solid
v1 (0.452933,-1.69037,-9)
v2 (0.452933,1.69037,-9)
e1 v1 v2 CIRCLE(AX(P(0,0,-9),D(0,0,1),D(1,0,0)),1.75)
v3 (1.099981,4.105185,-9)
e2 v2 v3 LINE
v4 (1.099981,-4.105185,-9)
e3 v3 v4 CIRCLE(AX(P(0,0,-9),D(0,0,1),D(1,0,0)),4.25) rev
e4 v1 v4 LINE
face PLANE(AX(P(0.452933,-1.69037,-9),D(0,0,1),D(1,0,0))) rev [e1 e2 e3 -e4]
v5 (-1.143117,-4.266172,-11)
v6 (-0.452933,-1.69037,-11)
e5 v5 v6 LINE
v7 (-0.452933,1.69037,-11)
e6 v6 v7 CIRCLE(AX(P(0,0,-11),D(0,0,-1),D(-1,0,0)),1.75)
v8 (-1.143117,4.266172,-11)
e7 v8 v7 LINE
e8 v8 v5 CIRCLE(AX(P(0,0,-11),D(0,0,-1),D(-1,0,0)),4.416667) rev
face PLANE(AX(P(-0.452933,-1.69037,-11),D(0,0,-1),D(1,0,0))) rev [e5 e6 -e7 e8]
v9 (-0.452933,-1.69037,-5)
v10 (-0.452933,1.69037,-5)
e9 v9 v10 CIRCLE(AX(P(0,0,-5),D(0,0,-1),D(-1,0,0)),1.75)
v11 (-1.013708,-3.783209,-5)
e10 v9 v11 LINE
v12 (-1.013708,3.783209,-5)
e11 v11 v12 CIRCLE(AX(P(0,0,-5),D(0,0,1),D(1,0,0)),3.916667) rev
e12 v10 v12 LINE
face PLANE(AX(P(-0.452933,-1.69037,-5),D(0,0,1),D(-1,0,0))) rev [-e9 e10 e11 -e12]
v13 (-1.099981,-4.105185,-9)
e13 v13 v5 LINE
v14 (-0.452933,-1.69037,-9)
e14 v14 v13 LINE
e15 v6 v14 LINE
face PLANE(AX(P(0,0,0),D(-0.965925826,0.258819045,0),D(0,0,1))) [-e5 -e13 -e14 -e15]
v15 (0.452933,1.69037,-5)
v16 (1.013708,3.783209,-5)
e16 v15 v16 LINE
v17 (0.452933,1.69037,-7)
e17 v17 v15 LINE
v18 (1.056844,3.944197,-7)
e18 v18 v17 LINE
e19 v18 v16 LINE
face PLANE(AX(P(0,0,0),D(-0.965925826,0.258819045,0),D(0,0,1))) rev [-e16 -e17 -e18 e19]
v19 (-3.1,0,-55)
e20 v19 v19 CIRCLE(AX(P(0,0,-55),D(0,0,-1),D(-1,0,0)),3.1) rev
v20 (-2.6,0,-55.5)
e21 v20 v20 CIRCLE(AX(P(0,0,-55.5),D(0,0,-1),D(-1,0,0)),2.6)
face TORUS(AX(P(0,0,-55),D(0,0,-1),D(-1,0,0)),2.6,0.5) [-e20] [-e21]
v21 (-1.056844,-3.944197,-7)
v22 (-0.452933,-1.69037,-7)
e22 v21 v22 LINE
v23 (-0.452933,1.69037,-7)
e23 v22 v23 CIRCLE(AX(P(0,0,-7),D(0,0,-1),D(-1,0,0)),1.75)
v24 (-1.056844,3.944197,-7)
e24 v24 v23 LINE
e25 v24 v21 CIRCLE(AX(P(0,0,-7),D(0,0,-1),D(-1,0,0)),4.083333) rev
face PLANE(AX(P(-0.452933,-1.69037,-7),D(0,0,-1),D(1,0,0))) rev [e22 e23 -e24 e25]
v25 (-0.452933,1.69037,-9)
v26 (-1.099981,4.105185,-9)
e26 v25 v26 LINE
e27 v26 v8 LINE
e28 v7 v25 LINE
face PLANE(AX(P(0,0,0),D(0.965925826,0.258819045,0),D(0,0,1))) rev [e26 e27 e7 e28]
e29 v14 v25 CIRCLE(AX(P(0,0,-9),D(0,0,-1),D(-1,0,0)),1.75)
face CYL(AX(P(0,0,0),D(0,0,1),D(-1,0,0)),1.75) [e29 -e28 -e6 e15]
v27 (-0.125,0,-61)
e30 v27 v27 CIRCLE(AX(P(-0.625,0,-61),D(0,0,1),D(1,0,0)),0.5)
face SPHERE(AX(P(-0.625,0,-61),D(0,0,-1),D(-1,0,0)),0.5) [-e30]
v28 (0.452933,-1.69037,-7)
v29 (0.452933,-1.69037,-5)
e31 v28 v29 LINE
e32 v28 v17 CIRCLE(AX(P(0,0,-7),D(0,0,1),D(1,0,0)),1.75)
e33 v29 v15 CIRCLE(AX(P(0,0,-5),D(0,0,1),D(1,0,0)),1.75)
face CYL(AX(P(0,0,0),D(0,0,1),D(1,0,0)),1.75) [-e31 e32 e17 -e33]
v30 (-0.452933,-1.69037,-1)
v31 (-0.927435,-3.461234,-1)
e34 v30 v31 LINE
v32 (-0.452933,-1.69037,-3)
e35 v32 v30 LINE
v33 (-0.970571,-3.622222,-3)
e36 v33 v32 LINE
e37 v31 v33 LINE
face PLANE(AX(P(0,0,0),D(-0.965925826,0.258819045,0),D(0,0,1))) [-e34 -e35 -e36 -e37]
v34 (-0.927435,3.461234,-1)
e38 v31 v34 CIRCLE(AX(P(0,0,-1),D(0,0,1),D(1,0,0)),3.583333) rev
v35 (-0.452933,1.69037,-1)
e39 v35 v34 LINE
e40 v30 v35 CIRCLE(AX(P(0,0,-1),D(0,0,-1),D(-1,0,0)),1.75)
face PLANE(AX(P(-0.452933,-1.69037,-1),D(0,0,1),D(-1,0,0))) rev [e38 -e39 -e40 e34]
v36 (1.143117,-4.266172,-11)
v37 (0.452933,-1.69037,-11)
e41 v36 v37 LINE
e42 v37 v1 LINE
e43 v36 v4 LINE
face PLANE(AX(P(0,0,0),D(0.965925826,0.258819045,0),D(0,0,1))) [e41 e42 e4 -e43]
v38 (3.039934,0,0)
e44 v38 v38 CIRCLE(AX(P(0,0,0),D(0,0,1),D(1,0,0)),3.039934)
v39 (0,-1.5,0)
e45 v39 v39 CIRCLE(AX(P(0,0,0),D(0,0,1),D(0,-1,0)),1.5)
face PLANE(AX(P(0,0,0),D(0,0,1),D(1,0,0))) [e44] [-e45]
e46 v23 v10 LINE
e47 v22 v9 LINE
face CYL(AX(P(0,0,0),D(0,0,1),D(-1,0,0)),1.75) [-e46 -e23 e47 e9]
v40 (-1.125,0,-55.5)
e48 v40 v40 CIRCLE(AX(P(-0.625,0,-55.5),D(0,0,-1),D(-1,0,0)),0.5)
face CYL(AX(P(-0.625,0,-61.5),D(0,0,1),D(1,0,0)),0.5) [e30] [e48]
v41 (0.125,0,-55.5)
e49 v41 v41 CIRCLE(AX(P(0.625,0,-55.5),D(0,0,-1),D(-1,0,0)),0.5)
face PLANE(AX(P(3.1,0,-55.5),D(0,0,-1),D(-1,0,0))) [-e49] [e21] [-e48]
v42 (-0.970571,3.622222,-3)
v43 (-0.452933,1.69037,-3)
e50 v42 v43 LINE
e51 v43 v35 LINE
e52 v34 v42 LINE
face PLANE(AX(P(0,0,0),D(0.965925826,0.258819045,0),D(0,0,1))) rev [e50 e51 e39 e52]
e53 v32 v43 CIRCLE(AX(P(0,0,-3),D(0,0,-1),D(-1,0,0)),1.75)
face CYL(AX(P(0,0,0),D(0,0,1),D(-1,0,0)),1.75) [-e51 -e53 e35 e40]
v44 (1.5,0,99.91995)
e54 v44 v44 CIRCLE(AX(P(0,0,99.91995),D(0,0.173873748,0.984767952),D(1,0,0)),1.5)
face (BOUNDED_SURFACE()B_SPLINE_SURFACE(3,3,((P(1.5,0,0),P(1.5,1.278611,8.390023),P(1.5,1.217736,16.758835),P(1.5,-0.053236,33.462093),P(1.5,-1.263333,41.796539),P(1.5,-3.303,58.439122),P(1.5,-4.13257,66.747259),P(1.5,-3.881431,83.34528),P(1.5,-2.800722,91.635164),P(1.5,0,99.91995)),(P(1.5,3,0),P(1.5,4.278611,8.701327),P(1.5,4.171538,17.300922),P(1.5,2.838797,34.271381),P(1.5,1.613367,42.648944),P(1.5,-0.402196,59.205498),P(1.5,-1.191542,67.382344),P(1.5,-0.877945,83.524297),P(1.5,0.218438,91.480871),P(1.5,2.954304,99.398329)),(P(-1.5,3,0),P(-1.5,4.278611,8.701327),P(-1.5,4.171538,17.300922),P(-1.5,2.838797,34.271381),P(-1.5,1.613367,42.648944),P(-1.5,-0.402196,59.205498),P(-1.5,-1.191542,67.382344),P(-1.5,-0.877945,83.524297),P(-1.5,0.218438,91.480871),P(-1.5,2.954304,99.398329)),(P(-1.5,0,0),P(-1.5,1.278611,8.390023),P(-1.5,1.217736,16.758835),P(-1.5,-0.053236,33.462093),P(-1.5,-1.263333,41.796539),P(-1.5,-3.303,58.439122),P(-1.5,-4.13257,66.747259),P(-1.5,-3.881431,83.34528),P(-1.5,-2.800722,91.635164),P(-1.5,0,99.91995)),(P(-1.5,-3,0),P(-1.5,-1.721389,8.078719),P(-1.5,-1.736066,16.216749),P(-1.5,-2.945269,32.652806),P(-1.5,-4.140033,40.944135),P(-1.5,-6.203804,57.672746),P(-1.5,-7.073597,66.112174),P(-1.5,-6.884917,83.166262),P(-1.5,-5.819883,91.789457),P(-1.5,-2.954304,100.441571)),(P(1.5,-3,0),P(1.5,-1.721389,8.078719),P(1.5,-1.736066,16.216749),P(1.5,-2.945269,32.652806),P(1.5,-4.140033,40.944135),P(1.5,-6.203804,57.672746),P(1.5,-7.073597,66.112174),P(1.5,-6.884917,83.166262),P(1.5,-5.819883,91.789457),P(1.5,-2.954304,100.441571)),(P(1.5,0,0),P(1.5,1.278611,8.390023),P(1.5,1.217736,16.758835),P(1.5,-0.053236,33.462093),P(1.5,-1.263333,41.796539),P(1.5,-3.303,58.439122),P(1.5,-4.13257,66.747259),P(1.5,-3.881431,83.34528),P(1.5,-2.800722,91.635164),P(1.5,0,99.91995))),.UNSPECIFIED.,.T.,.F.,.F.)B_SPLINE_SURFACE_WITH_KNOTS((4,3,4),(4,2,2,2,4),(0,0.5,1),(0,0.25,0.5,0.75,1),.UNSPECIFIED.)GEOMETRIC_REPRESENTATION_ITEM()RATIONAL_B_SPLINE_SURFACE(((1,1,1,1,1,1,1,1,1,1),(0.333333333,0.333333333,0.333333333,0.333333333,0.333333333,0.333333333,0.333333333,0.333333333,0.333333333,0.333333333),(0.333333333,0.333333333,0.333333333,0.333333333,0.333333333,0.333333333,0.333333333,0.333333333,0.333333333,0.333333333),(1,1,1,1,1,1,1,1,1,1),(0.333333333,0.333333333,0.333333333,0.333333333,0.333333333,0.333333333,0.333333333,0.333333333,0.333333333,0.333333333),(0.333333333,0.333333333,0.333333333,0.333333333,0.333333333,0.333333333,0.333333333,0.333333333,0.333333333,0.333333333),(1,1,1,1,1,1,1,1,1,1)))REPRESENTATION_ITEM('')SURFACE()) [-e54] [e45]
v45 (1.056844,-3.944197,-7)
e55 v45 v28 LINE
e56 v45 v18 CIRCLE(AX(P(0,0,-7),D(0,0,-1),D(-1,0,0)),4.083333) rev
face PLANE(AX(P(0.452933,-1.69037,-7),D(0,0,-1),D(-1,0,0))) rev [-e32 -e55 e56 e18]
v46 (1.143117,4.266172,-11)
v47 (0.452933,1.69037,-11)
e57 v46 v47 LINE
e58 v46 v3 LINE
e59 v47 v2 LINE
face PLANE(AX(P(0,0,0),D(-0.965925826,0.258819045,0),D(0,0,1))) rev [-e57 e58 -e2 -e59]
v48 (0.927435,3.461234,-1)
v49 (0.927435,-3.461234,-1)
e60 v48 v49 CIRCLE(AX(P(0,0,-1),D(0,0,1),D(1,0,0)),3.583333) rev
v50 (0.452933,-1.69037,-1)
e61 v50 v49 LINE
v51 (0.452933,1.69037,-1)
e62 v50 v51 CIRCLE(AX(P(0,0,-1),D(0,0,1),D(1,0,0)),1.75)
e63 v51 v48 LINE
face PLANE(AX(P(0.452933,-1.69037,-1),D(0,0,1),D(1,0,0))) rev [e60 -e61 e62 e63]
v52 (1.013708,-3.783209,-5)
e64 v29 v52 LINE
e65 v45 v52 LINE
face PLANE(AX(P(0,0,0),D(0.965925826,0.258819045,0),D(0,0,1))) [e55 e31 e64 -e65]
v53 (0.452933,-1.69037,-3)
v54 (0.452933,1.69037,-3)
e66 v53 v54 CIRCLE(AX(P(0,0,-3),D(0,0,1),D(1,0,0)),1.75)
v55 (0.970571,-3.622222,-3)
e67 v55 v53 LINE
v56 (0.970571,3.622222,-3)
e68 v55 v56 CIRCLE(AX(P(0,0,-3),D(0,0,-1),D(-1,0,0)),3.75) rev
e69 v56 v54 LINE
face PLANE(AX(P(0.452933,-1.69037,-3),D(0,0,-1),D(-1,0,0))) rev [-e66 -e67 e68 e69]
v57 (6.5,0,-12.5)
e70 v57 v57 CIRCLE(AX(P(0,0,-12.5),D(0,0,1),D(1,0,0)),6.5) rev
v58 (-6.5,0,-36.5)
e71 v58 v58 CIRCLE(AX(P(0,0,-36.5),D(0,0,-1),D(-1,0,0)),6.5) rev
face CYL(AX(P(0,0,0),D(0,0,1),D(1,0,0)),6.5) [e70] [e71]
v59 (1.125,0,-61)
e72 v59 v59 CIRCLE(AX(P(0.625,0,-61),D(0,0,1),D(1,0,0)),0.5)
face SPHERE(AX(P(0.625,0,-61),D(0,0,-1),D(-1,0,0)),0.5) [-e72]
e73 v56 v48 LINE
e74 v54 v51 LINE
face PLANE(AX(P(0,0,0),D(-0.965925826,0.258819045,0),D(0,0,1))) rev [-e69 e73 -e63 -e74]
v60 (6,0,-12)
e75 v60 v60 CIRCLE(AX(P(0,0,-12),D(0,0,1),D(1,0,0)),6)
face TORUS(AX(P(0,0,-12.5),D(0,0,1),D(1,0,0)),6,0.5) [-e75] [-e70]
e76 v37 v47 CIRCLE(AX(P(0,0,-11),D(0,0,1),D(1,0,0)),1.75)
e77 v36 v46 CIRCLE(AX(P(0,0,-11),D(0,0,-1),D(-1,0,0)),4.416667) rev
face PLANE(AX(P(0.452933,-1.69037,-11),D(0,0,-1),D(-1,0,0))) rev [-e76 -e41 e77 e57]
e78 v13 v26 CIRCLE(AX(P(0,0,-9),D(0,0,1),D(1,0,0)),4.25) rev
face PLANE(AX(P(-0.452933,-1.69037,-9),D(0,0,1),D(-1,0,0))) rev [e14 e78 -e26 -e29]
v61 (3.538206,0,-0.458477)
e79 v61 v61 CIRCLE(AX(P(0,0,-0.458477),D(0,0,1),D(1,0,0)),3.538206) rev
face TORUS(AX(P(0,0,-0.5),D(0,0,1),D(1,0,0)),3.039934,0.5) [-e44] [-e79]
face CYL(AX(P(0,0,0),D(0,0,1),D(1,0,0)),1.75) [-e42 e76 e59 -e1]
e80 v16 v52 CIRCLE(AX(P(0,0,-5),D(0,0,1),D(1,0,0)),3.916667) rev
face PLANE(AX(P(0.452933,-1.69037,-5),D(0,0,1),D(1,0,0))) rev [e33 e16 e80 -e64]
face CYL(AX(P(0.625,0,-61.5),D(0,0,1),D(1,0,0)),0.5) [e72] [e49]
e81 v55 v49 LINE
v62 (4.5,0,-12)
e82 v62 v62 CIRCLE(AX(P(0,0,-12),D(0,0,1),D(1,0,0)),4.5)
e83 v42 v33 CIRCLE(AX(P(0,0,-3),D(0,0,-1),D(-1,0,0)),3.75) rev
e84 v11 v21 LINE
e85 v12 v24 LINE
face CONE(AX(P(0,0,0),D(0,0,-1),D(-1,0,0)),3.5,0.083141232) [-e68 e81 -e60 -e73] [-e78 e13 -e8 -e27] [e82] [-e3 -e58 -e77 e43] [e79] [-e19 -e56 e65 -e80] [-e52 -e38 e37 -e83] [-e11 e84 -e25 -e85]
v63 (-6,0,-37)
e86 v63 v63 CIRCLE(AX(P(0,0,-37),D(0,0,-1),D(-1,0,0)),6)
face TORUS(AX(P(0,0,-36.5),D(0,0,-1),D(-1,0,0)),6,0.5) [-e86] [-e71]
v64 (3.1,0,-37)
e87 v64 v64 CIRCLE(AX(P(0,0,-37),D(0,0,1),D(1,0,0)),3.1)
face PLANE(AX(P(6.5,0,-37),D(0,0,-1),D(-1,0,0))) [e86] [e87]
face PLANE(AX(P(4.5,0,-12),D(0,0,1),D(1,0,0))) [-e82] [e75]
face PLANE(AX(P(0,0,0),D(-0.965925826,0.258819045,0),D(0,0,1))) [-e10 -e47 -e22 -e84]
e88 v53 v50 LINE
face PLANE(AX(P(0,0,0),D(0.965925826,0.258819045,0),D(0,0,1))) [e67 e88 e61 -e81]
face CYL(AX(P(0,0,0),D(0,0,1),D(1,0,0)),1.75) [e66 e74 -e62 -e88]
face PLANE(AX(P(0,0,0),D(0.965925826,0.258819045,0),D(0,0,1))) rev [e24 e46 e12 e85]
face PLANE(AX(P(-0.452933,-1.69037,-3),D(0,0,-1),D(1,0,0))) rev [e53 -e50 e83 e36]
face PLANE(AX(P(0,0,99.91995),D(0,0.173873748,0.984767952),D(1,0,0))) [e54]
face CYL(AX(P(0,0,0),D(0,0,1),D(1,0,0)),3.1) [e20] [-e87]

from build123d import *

# Parameters (mm, degrees)
SKETCH3_R            = 0.5
BOSS_EXTRUDE1_DEPTH  = 6
FILLET1_R            = 0.5
SKETCH4_R            = 1.5
CUT_REVOLVE1_START   = -11
CUT_REVOLVE1_DEPTH   = 2
CUT_REVOLVE1_START_2 = -7
CUT_REVOLVE1_2_DEPTH = 2
CUT_REVOLVE1_START_3 = -3
CUT_REVOLVE1_3_DEPTH = 2


# Read off the part's stored shape, not the designer's step: Cut-Revolve1
with BuildPart() as part:
    # Sketch2 → Revolve1 (revolve)
    with BuildSketch(Plane(origin=(0, 0, 0), x_dir=(1, 0, 0), z_dir=(0, 1, 0))):
        Polygon((0, 0), (3.5, 0), (4.5, 12), (6.5, 12), (6.5, 37), (3.1, 37), (3.1, 55.5), (0, 55.5), align=None)
    revolve(axis=Axis((0, 0, 0), (0, 0, -1)))

    # Sketch3 → Boss-Extrude1 (add)
    with BuildSketch(Plane(origin=(0, 0, -55.5), x_dir=(-1, 0, 0), z_dir=(0, 0, -1))):
        with Locations((0.625, 0)):
            Circle(SKETCH3_R)
        with Locations((-0.625, 0)):
            Circle(SKETCH3_R)
    extrude(amount=BOSS_EXTRUDE1_DEPTH)

    # Fillet1
    fillet1_edges = [part.edges().sort_by_distance(p)[0] for p in [
        (-0.125, 0, -61.5),
        (1.125, 0, -61.5),
        (-3.1, 0, -55.5),
        (-6.5, 0, -37),
        (-6.5, 0, -12),
        (-3.5, 0, 0),
    ]]
    fillet(fillet1_edges, radius=FILLET1_R)

    # Sweep1: sweep along a path in Sketch5
    with BuildLine() as sweep1_path:  # in the path sketch's own coordinates; laid on its plane below (add() does not lay a ready-made edge on the line's plane)
        add(Edge.make_bspline(
            [(0, 0), (-33.560093423, 5.11444516), (-66.780805362, -11.20288957), (-99.919950145, 0)],
            knots=[0, 0, 0, 0, 1, 1, 1, 1], degree=3))
    # Sketch4 → Sweep1 (sweep)
    with BuildSketch(Plane.XY):
        Circle(SKETCH4_R)
    sweep(path=Plane(origin=(0, 0, 0), x_dir=(0, 0, -1), z_dir=(1, 0, 0)) * sweep1_path.line)

    # Cut-Revolve1 outline → Cut-Revolve1 (cut)
    with BuildSketch(Plane.XY.offset(CUT_REVOLVE1_START)):
        with BuildLine():
            ThreePointArc((0.452933329, 1.690370196), (1.75, 0), (0.452933329, -1.690370196))
            Line((0.452933329, -1.690370196), (0.970571419, -3.622221849))
            Line((0.970571419, -3.622221849), (1.056844434, -3.944197124))
            Line((1.056844434, -3.944197124), (1.143117449, -4.266172399))
            Line((1.143117449, -4.266172399), (1.607695154, -6))
            Line((1.607695154, -6), (6, -6))
            Line((6, -6), (6, 6))
            Line((6, 6), (1.607695154, 6))
            Line((1.607695154, 6), (1.143117449, 4.266172399))
            Line((1.143117449, 4.266172399), (1.056844434, 3.944197124))
            Line((1.056844434, 3.944197124), (0.970571419, 3.622221849))
            Line((0.970571419, 3.622221849), (0.452933329, 1.690370196))
        make_face()
    cut_revolve1 = extrude(amount=CUT_REVOLVE1_DEPTH, mode=Mode.SUBTRACT)

    # Cut-Revolve1 2 outline → Cut-Revolve1 2 (cut)
    with BuildSketch(Plane.XY.offset(CUT_REVOLVE1_START_2)):
        with BuildLine():
            ThreePointArc((0.452933329, 1.690370196), (1.75, 0), (0.452933329, -1.690370196))
            Line((0.452933329, -1.690370196), (0.970571419, -3.622221849))
            Line((0.970571419, -3.622221849), (1.056844434, -3.944197124))
            Line((1.056844434, -3.944197124), (1.143117449, -4.266172399))
            Line((1.143117449, -4.266172399), (1.607695154, -6))
            Line((1.607695154, -6), (6, -6))
            Line((6, -6), (6, 6))
            Line((6, 6), (1.607695154, 6))
            Line((1.607695154, 6), (1.143117449, 4.266172399))
            Line((1.143117449, 4.266172399), (1.056844434, 3.944197124))
            Line((1.056844434, 3.944197124), (0.970571419, 3.622221849))
            Line((0.970571419, 3.622221849), (0.452933329, 1.690370196))
        make_face()
    cut_revolve1_2 = extrude(amount=CUT_REVOLVE1_2_DEPTH, mode=Mode.SUBTRACT)

    # Cut-Revolve1 3 outline → Cut-Revolve1 3 (cut)
    with BuildSketch(Plane.XY.offset(CUT_REVOLVE1_START_3)):
        with BuildLine():
            ThreePointArc((0.452933329, 1.690370196), (1.75, 0), (0.452933329, -1.690370196))
            Line((0.452933329, -1.690370196), (0.970571419, -3.622221849))
            Line((0.970571419, -3.622221849), (1.056844434, -3.944197124))
            Line((1.056844434, -3.944197124), (1.143117449, -4.266172399))
            Line((1.143117449, -4.266172399), (1.607695154, -6))
            Line((1.607695154, -6), (6, -6))
            Line((6, -6), (6, 6))
            Line((6, 6), (1.607695154, 6))
            Line((1.607695154, 6), (1.143117449, 4.266172399))
            Line((1.143117449, 4.266172399), (1.056844434, 3.944197124))
            Line((1.056844434, 3.944197124), (0.970571419, 3.622221849))
            Line((0.970571419, 3.622221849), (0.452933329, 1.690370196))
        make_face()
    cut_revolve1_3 = extrude(amount=CUT_REVOLVE1_3_DEPTH, mode=Mode.SUBTRACT)

    # Mirror1: Cut-Revolve1, Cut-Revolve1 2, Cut-Revolve1 3 across plane
    add(cut_revolve1.mirror(Plane(origin=(0, 0, 0), x_dir=(0, 0, 1), z_dir=(1, 0, 0))), mode=Mode.SUBTRACT)
    add(cut_revolve1_2.mirror(Plane(origin=(0, 0, 0), x_dir=(0, 0, 1), z_dir=(1, 0, 0))), mode=Mode.SUBTRACT)
    add(cut_revolve1_3.mirror(Plane(origin=(0, 0, 0), x_dir=(0, 0, 1), z_dir=(1, 0, 0))), mode=Mode.SUBTRACT)


solid = part.part
